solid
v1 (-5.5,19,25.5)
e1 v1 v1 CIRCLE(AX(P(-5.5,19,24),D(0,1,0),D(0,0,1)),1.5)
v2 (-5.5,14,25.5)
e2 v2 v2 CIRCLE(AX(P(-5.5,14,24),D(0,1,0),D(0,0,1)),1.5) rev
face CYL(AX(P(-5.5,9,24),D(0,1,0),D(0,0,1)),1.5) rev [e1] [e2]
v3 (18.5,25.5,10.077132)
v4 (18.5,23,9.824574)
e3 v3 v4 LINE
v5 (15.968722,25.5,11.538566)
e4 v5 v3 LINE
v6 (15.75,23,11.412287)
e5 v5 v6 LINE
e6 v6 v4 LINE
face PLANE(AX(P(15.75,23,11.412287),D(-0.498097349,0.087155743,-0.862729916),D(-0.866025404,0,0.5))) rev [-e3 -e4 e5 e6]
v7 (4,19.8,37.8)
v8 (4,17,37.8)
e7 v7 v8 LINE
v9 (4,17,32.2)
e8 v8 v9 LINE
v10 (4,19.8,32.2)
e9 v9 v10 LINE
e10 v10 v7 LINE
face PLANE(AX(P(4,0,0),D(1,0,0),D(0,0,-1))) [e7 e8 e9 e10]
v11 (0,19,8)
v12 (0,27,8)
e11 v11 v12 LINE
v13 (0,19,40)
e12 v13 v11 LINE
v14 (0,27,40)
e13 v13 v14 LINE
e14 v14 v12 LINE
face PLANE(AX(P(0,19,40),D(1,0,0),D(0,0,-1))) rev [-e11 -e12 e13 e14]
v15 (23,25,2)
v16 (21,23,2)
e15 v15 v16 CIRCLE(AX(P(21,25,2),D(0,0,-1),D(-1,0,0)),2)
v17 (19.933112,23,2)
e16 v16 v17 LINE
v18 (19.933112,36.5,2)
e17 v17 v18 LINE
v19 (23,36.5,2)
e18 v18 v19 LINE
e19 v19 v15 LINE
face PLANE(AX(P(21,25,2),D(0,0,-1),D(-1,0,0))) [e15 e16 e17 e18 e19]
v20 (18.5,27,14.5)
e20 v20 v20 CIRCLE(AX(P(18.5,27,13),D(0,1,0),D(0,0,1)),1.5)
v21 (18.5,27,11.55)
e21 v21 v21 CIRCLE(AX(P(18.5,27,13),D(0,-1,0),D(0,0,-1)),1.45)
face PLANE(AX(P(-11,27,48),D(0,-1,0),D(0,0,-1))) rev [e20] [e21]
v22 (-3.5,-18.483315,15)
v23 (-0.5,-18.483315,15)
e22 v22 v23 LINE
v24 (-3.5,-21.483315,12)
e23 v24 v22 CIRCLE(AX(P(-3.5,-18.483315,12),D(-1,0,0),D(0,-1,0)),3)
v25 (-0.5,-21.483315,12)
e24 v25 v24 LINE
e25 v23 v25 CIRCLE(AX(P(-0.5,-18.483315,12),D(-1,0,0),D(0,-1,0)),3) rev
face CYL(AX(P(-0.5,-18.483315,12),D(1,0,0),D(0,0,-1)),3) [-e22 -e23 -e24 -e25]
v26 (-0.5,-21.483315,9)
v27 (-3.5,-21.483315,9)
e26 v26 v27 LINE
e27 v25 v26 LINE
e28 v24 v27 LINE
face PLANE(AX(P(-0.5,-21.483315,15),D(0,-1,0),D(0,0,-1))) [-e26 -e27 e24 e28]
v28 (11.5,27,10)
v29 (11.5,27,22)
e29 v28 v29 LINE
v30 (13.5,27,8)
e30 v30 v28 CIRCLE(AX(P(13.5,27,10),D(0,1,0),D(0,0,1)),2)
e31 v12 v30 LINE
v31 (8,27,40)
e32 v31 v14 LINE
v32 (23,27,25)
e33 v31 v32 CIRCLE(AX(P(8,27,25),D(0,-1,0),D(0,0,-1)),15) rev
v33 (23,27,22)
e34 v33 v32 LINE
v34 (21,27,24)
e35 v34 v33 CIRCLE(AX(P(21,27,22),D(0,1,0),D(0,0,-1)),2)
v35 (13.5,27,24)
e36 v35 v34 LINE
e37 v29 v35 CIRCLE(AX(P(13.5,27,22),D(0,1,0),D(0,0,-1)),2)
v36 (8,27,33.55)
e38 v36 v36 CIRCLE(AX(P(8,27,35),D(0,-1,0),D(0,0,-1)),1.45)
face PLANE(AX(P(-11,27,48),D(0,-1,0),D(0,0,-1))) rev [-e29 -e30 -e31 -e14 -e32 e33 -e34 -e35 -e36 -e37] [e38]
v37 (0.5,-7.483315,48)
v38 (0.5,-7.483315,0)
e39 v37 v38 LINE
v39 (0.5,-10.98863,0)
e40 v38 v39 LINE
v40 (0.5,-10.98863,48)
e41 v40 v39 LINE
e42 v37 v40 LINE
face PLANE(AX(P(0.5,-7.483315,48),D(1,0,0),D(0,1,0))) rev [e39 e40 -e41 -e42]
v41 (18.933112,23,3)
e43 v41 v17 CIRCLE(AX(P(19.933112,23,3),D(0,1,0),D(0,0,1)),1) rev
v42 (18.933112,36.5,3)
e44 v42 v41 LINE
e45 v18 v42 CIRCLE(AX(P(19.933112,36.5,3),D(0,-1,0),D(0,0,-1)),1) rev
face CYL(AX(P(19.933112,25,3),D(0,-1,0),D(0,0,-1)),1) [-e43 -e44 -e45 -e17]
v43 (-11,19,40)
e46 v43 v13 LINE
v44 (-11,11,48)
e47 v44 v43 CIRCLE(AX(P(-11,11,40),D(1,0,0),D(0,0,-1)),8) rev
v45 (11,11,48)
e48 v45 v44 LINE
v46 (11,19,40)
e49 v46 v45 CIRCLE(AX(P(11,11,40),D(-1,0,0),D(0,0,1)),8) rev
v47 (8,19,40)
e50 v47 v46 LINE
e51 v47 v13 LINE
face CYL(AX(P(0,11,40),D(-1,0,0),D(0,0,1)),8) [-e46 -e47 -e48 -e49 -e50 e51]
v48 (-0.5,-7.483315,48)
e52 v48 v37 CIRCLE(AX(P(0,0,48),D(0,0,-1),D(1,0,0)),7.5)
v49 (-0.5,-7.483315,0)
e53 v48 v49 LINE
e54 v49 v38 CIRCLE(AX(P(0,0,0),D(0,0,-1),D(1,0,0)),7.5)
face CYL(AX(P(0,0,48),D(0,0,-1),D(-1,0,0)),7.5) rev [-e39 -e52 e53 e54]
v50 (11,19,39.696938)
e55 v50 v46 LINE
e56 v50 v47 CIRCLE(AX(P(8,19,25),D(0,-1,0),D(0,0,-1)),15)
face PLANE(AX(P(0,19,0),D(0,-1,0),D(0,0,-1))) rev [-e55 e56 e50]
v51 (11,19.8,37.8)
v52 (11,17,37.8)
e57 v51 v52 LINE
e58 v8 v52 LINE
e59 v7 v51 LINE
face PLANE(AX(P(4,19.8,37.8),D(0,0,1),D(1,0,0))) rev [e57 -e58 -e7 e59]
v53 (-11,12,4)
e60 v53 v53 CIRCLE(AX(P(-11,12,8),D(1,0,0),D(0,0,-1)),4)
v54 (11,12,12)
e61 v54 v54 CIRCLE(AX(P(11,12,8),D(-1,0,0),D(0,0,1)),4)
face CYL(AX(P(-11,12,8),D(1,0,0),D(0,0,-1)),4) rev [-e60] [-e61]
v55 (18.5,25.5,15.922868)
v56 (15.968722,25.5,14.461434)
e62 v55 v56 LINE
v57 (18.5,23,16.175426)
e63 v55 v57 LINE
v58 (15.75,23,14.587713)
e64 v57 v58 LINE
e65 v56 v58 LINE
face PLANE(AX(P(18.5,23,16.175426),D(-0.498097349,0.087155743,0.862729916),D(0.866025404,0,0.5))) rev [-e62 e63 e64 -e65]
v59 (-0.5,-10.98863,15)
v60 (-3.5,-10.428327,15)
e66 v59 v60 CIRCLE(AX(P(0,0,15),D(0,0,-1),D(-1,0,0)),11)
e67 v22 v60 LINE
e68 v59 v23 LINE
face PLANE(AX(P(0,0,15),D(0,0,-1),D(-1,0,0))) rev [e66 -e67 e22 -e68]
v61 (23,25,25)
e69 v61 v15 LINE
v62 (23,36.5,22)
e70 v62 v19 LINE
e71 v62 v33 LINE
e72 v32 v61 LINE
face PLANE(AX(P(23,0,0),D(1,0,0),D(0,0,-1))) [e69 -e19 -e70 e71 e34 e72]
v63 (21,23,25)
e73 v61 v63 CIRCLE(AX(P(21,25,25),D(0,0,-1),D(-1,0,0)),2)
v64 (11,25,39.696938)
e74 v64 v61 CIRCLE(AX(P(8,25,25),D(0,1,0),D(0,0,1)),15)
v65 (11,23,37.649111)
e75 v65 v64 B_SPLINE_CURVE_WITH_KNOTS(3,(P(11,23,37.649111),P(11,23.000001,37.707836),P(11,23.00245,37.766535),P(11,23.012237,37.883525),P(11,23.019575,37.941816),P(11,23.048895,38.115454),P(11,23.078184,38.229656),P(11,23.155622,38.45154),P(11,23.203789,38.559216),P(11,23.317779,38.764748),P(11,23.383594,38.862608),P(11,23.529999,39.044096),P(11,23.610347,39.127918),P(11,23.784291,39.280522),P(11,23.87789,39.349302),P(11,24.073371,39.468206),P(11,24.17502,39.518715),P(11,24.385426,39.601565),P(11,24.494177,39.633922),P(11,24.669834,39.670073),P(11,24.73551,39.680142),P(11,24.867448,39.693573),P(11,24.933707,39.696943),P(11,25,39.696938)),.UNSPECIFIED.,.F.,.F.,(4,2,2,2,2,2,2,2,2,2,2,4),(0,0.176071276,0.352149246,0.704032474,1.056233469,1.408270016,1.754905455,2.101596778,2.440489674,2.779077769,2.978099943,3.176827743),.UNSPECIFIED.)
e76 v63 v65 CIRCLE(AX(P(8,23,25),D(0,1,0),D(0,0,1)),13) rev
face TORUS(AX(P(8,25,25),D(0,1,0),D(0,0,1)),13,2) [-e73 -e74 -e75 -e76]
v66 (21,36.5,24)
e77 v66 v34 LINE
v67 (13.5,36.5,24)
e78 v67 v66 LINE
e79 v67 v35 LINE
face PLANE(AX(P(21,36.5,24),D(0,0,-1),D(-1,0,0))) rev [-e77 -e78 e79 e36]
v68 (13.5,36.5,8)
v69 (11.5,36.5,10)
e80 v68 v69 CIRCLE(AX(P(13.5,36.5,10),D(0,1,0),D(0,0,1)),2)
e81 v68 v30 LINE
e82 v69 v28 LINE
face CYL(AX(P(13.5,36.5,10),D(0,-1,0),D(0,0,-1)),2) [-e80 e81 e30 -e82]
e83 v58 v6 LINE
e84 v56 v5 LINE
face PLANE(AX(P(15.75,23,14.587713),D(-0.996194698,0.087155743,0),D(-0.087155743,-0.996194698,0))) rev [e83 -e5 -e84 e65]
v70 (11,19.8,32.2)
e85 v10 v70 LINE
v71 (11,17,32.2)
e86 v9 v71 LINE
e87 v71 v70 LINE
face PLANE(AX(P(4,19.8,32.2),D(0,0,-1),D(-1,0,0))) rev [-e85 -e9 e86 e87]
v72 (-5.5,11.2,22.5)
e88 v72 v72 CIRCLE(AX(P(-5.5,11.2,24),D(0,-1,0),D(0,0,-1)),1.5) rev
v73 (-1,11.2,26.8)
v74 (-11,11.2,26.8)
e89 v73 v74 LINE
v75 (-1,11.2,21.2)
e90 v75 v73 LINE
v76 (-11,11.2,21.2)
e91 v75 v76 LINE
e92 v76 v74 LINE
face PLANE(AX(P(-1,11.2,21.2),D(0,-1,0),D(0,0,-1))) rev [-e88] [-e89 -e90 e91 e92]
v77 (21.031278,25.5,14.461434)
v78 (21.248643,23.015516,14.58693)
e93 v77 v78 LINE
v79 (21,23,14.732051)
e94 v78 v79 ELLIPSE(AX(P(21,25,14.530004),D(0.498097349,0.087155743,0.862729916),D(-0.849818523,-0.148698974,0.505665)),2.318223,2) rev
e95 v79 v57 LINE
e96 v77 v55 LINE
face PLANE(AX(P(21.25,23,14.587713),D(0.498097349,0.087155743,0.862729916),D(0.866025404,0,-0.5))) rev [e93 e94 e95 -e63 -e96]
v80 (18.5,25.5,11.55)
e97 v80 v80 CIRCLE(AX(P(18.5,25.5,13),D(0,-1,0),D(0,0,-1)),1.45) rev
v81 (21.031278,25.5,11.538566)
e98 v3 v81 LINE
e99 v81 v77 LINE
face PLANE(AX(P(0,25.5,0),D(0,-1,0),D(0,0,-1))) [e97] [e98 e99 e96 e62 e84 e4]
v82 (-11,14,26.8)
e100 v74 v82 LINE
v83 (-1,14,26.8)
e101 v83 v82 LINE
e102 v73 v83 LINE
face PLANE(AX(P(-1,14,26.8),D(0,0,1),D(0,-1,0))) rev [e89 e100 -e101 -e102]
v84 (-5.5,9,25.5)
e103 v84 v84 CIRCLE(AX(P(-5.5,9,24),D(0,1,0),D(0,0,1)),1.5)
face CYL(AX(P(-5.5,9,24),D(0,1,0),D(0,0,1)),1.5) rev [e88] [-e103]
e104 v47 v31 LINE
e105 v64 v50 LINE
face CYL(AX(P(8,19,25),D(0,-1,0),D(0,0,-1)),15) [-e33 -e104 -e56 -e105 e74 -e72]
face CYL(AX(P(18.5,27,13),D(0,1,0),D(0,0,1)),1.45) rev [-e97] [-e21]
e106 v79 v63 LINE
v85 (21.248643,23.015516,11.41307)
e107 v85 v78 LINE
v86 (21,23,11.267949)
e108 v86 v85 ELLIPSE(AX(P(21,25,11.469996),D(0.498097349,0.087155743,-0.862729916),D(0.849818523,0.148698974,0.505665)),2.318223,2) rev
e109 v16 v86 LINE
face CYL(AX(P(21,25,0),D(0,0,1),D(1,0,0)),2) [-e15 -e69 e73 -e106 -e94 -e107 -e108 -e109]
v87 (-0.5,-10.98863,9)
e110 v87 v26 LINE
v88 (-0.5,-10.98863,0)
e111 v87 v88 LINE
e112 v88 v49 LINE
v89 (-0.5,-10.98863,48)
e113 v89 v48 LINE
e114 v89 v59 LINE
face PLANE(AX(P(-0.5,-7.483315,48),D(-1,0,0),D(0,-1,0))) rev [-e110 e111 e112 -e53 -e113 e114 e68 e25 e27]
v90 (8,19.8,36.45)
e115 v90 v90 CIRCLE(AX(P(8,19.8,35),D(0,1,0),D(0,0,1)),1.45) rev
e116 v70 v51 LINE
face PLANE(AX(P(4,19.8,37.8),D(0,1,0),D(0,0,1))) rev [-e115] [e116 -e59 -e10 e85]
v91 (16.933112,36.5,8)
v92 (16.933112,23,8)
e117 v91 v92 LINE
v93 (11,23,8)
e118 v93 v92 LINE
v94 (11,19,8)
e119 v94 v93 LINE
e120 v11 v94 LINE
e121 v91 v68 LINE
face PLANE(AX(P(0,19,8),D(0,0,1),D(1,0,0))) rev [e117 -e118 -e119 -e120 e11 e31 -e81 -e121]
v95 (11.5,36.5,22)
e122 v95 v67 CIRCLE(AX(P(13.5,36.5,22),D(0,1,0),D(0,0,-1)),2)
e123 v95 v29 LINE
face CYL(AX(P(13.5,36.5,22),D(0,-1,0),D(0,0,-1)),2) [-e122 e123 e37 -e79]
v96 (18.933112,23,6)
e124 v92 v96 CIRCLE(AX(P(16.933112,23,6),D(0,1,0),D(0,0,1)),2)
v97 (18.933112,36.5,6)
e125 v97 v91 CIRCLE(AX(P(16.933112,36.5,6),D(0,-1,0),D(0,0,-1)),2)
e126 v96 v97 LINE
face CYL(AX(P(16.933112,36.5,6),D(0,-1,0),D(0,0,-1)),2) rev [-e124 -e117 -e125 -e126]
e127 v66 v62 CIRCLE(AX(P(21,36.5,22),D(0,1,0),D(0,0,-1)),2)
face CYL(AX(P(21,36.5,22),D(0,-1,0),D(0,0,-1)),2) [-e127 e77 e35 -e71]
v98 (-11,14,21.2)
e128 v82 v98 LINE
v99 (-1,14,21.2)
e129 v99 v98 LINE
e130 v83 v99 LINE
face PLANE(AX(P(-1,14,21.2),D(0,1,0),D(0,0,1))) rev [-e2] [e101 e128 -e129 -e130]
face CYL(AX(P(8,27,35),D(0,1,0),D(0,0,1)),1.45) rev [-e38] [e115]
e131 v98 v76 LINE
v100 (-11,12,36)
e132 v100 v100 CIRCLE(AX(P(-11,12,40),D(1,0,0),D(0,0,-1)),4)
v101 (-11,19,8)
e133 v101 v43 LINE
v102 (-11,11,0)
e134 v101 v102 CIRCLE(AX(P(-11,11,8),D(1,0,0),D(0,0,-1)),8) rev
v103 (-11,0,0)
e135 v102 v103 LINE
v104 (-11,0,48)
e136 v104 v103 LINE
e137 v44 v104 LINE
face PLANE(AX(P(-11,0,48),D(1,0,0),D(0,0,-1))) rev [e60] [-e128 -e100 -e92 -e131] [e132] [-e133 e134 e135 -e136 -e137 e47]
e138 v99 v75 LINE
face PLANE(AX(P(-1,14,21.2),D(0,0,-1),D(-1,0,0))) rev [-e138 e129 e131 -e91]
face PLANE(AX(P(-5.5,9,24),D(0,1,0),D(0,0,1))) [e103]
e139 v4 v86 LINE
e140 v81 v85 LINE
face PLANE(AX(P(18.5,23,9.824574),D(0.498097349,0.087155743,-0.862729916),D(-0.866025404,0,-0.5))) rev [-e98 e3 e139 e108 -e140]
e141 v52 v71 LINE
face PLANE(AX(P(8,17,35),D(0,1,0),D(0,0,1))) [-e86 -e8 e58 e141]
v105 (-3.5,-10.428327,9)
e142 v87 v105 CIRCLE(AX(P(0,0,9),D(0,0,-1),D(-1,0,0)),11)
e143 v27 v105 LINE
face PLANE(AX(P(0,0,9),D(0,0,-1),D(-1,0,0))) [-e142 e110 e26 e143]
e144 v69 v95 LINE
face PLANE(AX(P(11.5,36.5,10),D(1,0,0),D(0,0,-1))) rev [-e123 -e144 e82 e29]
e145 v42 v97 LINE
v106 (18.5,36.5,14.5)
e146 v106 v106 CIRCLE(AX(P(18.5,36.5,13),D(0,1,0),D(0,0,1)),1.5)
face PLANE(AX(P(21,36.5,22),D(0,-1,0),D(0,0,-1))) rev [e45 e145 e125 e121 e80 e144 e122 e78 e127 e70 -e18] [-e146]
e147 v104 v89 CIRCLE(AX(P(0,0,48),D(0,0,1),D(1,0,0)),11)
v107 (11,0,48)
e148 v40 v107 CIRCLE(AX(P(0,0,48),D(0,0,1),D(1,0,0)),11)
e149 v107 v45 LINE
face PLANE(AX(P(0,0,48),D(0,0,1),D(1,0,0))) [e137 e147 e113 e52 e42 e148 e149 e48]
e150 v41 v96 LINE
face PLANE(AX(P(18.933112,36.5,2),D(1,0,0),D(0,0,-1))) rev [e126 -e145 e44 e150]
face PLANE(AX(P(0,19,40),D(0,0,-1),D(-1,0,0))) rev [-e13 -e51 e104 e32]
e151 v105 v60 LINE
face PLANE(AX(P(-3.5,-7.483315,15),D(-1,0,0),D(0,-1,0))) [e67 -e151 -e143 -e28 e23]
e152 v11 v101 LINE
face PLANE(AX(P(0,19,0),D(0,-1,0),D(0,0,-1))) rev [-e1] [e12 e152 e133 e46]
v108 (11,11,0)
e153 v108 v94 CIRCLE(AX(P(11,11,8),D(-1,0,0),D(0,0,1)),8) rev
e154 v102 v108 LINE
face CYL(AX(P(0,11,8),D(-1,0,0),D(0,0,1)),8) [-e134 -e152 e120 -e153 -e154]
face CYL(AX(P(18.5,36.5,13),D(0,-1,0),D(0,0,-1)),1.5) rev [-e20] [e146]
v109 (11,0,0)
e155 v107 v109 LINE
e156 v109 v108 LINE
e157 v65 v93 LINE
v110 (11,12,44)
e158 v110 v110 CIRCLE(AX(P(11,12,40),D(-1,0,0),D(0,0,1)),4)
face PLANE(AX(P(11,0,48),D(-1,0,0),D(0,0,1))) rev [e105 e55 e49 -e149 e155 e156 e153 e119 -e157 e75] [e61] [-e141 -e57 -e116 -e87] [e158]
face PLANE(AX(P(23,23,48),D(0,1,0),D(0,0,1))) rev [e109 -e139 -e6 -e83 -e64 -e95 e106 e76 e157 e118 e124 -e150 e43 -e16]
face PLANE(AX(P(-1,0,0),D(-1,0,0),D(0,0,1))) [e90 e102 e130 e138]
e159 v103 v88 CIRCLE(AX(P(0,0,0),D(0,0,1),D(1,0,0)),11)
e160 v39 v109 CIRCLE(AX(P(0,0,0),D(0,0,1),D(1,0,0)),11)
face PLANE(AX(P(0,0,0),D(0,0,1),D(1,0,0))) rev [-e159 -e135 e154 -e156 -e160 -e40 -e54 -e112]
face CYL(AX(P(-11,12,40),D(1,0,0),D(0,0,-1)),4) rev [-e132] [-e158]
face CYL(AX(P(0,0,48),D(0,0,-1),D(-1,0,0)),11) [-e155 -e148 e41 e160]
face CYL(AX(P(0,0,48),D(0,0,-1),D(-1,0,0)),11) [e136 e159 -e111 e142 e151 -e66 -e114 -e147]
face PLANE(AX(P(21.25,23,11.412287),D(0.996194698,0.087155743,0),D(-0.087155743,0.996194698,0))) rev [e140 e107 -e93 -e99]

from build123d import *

# Parameters (mm, degrees)
EXTRUDE_1_DEPTH          = 48
CUT_EXTRUDE_1_DEPTH      = 60.304300013
CUT_EXTRUDE_1_DEPTH_BACK = 60.304300013
SKETCH_3_R               = 4
CUT_EXTRUDE_2_DEPTH      = 60.304300013
CUT_EXTRUDE_2_DEPTH_BACK = 60.304300013
SKETCH_4_R               = 4
SKETCH_5_W               = 48
SKETCH_5_H               = 4
EXTRUDE_3_DEPTH          = 12
CUT_EXTRUDE_3_DEPTH      = 66.39217114
CUT_EXTRUDE_3_DEPTH_BACK = 25
CUT_EXTRUDE_3_START      = 15
SKETCH_7_R               = 1.45
CUT_EXTRUDE_4_DEPTH      = 66.39217114
CUT_EXTRUDE_4_DEPTH_BACK = 66.39217114
CUT_EXTRUDE_5_DEPTH      = 8
SKETCH_10_R              = 1.5
CUT_EXTRUDE_6_DEPTH      = 10
SKETCH_11_W              = 5.6
SKETCH_11_H              = 2.8
CUT_EXTRUDE_7_DEPTH      = 10
SKETCH_13_R              = 1.5
EXTRUDE_4_DEPTH          = 9.5
FILLET_2_R               = 15
FILLET_4_R               = 8
FILLET_5_R               = 2
EXTRUDE_5_DEPTH          = 6
FILLET_6_R               = 2
FILLET_7_R               = 1
EXTRUDE_START            = -9
SKETCH_15_W              = 3
SKETCH_15_H              = 14
EXTRUDE_6_DEPTH          = 6
FILLET_8_R               = 3
SKETCH_16_W              = 5.6
SKETCH_16_H              = 2.8
CUT_EXTRUDE_8_DEPTH      = 7
CUT_EXTRUDE_9_DEPTH      = 2.5
CUT_EXTRUDE_9_DRAFT      = -5


# Some blends are built 0.0001 mm under size
with BuildPart() as part:
    # Эскиз2 → Бобышка-Вытянуть1 (new body)
    with BuildSketch(Plane.XY):
        with BuildLine():
            Line((0.5, -7.483314774), (0.5, -10.988630488))
            ThreePointArc((0.5, -10.988630488), (7.95298686, -7.599342077), (11, 0))
            Line((11, 0), (11, 27))
            Line((11, 27), (-11, 27))
            Line((-11, 27), (-11, 0))
            ThreePointArc((-11, 0), (-7.95298686, -7.599342077), (-0.5, -10.988630488))
            Line((-0.5, -10.988630488), (-0.5, -7.483314774))
            ThreePointArc((-0.5, -7.483314774), (0, 7.5), (0.5, -7.483314774))
        make_face()
    extrude(amount=EXTRUDE_1_DEPTH)

    # Эскиз3 → Вырез-Вытянуть1 (cut, two sides: drawn at the far end of the back side and taken through both)
    with BuildSketch(Plane(origin=(11, 0, 0), x_dir=(0, 0, -1), z_dir=(1, 0, 0)).offset(-CUT_EXTRUDE_1_DEPTH_BACK)):
        with Locations((-40, 12)):
            Circle(SKETCH_3_R)
    extrude(amount=CUT_EXTRUDE_1_DEPTH + CUT_EXTRUDE_1_DEPTH_BACK, mode=Mode.SUBTRACT)

    # Эскиз4 → Вырез-Вытянуть2 (cut, two sides: drawn at the far end of the back side and taken through both)
    with BuildSketch(Plane(origin=(11, 0, 0), x_dir=(0, 0, -1), z_dir=(1, 0, 0)).offset(-CUT_EXTRUDE_2_DEPTH_BACK)):
        with Locations((-8, 12)):
            Circle(SKETCH_4_R)
    extrude(amount=CUT_EXTRUDE_2_DEPTH + CUT_EXTRUDE_2_DEPTH_BACK, mode=Mode.SUBTRACT)

    # Эскиз5 → Бобышка-Вытянуть3 (add)
    with BuildSketch(Plane(origin=(11, 0, 0), x_dir=(0, 0, -1), z_dir=(1, 0, 0))):
        with Locations((-24, 25)):
            Rectangle(SKETCH_5_W, SKETCH_5_H)
    extrude(amount=EXTRUDE_3_DEPTH)

    # Эскиз7 → Вырез-Вытянуть3 (cut, two sides: drawn at the far end of the back side and taken through both)
    with BuildSketch(Plane(origin=(0, 27, 0), x_dir=(1, 0, 0), z_dir=(0, 1, 0)).offset(CUT_EXTRUDE_3_START - CUT_EXTRUDE_3_DEPTH_BACK)):
        with Locations(Location((8, -35, 0), (0, 0, 270))):
            Circle(SKETCH_7_R)
        with Locations(Location((18.5, -13, 0), (0, 0, 270))):
            Circle(SKETCH_7_R)
    extrude(amount=CUT_EXTRUDE_3_DEPTH + CUT_EXTRUDE_3_DEPTH_BACK, mode=Mode.SUBTRACT)

    # Эскиз8 → Вырез-Вытянуть4 (cut, two sides: drawn at the far end of the back side and taken through both)
    with BuildSketch(Plane(origin=(0, 27, 0), x_dir=(1, 0, 0), z_dir=(0, 1, 0)).offset(-CUT_EXTRUDE_4_DEPTH_BACK)):
        with BuildLine():
            Line((23, -48), (20, -48))
            ThreePointArc((20, -48), (22.121320344, -47.121320344), (23, -45))
            Line((23, -45), (23, -48))
        make_face()
        with BuildLine():
            Line((23, 0), (23, -3))
            ThreePointArc((23, -3), (22.121320344, -0.878679656), (20, 0))
            Line((20, 0), (23, 0))
        make_face()
    extrude(amount=CUT_EXTRUDE_4_DEPTH + CUT_EXTRUDE_4_DEPTH_BACK, mode=Mode.SUBTRACT)

    # Эскиз9 → Вырез-Вытянуть5 (cut)
    with BuildSketch(Plane(origin=(0, 27, 0), x_dir=(1, 0, 0), z_dir=(0, 1, 0))):
        Polygon((-11, -48), (23, -48), (23, -40), (0, -40), (0, -8), (23, -8), (23, 0), (-11, 0), (-11, -8), (-11, -40), align=None)
    extrude(amount=-CUT_EXTRUDE_5_DEPTH, mode=Mode.SUBTRACT)

    # Эскиз10 → Вырез-Вытянуть6 (cut)
    with BuildSketch(Plane(origin=(0, 19, 0), x_dir=(1, 0, 0), z_dir=(0, 1, 0))):
        with Locations(Location((-5.5, -24, 0), (0, 0, 270))):
            Circle(SKETCH_10_R)
    extrude(amount=-CUT_EXTRUDE_6_DEPTH, mode=Mode.SUBTRACT)

    # Эскиз11 → Вырез-Вытянуть7 (cut)
    with BuildSketch(Plane.ZY.offset(11)):
        with Locations((24, 12.6)):
            Rectangle(SKETCH_11_W, SKETCH_11_H)
    extrude(amount=-CUT_EXTRUDE_7_DEPTH, mode=Mode.SUBTRACT)

    # Эскиз13 → Бобышка-Вытянуть4 (add)
    with BuildSketch(Plane(origin=(0, 27, 0), x_dir=(1, 0, 0), z_dir=(0, 1, 0))):
        with BuildLine():
            Line((21, -8), (13.5, -8))
            ThreePointArc((13.5, -8), (12.085786438, -8.585786438), (11.5, -10))
            Line((11.5, -10), (11.5, -22))
            ThreePointArc((11.5, -22), (12.085786438, -23.414213562), (13.5, -24))
            Line((13.5, -24), (21, -24))
            ThreePointArc((21, -24), (22.414213562, -23.414213562), (23, -22))
            Line((23, -22), (23, -10))
            Line((23, -10), (23, -8))
            Line((23, -8), (21, -8))
        make_face()
        with Locations(Location((18.5, -13, 0), (0, 0, 270))):
            Circle(SKETCH_13_R, mode=Mode.SUBTRACT)
    extrude(amount=EXTRUDE_4_DEPTH)

    # Скругление2
    # the kernel refuses this fillet: 15 mm, written as the material it takes off along each edge
    with BuildSketch(Plane(origin=(23, 64.5, 40), x_dir=(-1, 0, 0), z_dir=(0, -1, 0))) as fillet_2_piece_1_section:
        with BuildLine():
            CenterArc((FILLET_2_R, FILLET_2_R), FILLET_2_R, 180, 90)
            Line((0, FILLET_2_R), (0, 0))
            Line((0, 0), (FILLET_2_R, 0))
        make_face()
    fillet_2_piece_1 = extrude(amount=79, mode=Mode.PRIVATE)
    fillet_2_piece_1 = split(fillet_2_piece_1, bisect_by=Plane(origin=(10.251523637, 19, 39.909241185), z_dir=(0, 1, 0)), keep=Keep.TOP, mode=Mode.PRIVATE)
    add(fillet_2_piece_1, mode=Mode.SUBTRACT)

    # Скругление4
    fillet_4_edges = [part.edges().sort_by_distance(p)[0] for p in [
        (0, 19, 48),
        (0, 19, 0),
    ]]
    fillet(fillet_4_edges, radius=FILLET_4_R - 0.0001)  # a hair under: the kernel refuses the full size

    # Скругление5
    fillet_5_edges = [part.edges().sort_by_distance(p)[0] for p in [
        (23, 23, 16.5),
        (19.618950039, 23, 34.486832981),
    ]]
    fillet(fillet_5_edges, radius=FILLET_5_R)

    # Эскиз14 → Бобышка-Вытянуть5 (add)
    with BuildSketch(Plane(origin=(0, 0, 8), x_dir=(-1, 0, 0), z_dir=(0, 0, -1))):
        with BuildLine():
            Line((-23, 36.5), (-18.933112149, 36.5))
            Line((-18.933112149, 36.5), (-18.933112149, 23))
            Line((-18.933112149, 23), (-21, 23))
            ThreePointArc((-21, 23), (-22.414213562, 23.585786438), (-23, 25))
            Line((-23, 25), (-23, 36.5))
        make_face()
    extrude(amount=EXTRUDE_5_DEPTH)

    # Скругление6
    fillet_6_edges = [part.edges().sort_by_distance(p)[0] for p in [
        (18.933112149, 29.75, 8),
    ]]
    fillet(fillet_6_edges, radius=FILLET_6_R)

    # Скругление7
    fillet_7_edges = [part.edges().sort_by_distance(p)[0] for p in [
        (18.933112149, 29.75, 2),
    ]]
    fillet(fillet_7_edges, radius=FILLET_7_R)

    # Эскиз15 → Бобышка-Вытянуть6 (add)
    with BuildSketch(Plane(origin=(0, 0, 0), x_dir=(-1, 0, 0), z_dir=(0, 0, -1)).offset(EXTRUDE_START)):
        with Locations((2, -14.483314774)):
            Rectangle(SKETCH_15_W, SKETCH_15_H)
    extrude(amount=-EXTRUDE_6_DEPTH)

    # Скругление8
    fillet_8_edges = [part.edges().sort_by_distance(p)[0] for p in [
        (-2, -21.483314774, 15),
    ]]
    fillet(fillet_8_edges, radius=FILLET_8_R)

    # Эскиз16 → Вырез-Вытянуть8 (cut)
    with BuildSketch(Plane(origin=(11, 0, 0), x_dir=(0, 0, -1), z_dir=(1, 0, 0))):
        with Locations((-35, 18.4)):
            Rectangle(SKETCH_16_W, SKETCH_16_H)
    extrude(amount=-CUT_EXTRUDE_8_DEPTH, mode=Mode.SUBTRACT)


with BuildPart() as cut_extrude_9_tool:
    # Эскиз19 → Вырез-Вытянуть9 (with draft: the straight prism first)
    with BuildSketch(Plane.XZ.offset(-23)):
        Polygon((18.5, 16.175426481), (15.75, 14.58771324), (15.75, 11.41228676), (18.5, 9.824573519), (21.25, 11.41228676), (21.25, 14.58771324), align=None)
    extrude(amount=-CUT_EXTRUDE_9_DEPTH)
    # Вырез-Вытянуть9: the draft: its side faces are tilted about the plane it starts from
    cut_extrude_9_sides = [cut_extrude_9_tool.faces().sort_by_distance(p)[0] for p in [
        (17.125, 24.25, 15.38156986),
        (15.75, 24.25, 13),
        (17.125, 24.25, 10.61843014),
        (19.875, 24.25, 10.61843014),
        (21.25, 24.25, 13),
        (19.875, 24.25, 15.38156986),
    ]]
    draft(cut_extrude_9_sides, Plane.XZ.offset(-23), CUT_EXTRUDE_9_DRAFT)


with BuildPart() as part_1:
    add(part.part)

    # Вырез-Вытянуть9: cut by cut_extrude_9_tool
    add(cut_extrude_9_tool.part, mode=Mode.SUBTRACT)


solid = part_1.part
